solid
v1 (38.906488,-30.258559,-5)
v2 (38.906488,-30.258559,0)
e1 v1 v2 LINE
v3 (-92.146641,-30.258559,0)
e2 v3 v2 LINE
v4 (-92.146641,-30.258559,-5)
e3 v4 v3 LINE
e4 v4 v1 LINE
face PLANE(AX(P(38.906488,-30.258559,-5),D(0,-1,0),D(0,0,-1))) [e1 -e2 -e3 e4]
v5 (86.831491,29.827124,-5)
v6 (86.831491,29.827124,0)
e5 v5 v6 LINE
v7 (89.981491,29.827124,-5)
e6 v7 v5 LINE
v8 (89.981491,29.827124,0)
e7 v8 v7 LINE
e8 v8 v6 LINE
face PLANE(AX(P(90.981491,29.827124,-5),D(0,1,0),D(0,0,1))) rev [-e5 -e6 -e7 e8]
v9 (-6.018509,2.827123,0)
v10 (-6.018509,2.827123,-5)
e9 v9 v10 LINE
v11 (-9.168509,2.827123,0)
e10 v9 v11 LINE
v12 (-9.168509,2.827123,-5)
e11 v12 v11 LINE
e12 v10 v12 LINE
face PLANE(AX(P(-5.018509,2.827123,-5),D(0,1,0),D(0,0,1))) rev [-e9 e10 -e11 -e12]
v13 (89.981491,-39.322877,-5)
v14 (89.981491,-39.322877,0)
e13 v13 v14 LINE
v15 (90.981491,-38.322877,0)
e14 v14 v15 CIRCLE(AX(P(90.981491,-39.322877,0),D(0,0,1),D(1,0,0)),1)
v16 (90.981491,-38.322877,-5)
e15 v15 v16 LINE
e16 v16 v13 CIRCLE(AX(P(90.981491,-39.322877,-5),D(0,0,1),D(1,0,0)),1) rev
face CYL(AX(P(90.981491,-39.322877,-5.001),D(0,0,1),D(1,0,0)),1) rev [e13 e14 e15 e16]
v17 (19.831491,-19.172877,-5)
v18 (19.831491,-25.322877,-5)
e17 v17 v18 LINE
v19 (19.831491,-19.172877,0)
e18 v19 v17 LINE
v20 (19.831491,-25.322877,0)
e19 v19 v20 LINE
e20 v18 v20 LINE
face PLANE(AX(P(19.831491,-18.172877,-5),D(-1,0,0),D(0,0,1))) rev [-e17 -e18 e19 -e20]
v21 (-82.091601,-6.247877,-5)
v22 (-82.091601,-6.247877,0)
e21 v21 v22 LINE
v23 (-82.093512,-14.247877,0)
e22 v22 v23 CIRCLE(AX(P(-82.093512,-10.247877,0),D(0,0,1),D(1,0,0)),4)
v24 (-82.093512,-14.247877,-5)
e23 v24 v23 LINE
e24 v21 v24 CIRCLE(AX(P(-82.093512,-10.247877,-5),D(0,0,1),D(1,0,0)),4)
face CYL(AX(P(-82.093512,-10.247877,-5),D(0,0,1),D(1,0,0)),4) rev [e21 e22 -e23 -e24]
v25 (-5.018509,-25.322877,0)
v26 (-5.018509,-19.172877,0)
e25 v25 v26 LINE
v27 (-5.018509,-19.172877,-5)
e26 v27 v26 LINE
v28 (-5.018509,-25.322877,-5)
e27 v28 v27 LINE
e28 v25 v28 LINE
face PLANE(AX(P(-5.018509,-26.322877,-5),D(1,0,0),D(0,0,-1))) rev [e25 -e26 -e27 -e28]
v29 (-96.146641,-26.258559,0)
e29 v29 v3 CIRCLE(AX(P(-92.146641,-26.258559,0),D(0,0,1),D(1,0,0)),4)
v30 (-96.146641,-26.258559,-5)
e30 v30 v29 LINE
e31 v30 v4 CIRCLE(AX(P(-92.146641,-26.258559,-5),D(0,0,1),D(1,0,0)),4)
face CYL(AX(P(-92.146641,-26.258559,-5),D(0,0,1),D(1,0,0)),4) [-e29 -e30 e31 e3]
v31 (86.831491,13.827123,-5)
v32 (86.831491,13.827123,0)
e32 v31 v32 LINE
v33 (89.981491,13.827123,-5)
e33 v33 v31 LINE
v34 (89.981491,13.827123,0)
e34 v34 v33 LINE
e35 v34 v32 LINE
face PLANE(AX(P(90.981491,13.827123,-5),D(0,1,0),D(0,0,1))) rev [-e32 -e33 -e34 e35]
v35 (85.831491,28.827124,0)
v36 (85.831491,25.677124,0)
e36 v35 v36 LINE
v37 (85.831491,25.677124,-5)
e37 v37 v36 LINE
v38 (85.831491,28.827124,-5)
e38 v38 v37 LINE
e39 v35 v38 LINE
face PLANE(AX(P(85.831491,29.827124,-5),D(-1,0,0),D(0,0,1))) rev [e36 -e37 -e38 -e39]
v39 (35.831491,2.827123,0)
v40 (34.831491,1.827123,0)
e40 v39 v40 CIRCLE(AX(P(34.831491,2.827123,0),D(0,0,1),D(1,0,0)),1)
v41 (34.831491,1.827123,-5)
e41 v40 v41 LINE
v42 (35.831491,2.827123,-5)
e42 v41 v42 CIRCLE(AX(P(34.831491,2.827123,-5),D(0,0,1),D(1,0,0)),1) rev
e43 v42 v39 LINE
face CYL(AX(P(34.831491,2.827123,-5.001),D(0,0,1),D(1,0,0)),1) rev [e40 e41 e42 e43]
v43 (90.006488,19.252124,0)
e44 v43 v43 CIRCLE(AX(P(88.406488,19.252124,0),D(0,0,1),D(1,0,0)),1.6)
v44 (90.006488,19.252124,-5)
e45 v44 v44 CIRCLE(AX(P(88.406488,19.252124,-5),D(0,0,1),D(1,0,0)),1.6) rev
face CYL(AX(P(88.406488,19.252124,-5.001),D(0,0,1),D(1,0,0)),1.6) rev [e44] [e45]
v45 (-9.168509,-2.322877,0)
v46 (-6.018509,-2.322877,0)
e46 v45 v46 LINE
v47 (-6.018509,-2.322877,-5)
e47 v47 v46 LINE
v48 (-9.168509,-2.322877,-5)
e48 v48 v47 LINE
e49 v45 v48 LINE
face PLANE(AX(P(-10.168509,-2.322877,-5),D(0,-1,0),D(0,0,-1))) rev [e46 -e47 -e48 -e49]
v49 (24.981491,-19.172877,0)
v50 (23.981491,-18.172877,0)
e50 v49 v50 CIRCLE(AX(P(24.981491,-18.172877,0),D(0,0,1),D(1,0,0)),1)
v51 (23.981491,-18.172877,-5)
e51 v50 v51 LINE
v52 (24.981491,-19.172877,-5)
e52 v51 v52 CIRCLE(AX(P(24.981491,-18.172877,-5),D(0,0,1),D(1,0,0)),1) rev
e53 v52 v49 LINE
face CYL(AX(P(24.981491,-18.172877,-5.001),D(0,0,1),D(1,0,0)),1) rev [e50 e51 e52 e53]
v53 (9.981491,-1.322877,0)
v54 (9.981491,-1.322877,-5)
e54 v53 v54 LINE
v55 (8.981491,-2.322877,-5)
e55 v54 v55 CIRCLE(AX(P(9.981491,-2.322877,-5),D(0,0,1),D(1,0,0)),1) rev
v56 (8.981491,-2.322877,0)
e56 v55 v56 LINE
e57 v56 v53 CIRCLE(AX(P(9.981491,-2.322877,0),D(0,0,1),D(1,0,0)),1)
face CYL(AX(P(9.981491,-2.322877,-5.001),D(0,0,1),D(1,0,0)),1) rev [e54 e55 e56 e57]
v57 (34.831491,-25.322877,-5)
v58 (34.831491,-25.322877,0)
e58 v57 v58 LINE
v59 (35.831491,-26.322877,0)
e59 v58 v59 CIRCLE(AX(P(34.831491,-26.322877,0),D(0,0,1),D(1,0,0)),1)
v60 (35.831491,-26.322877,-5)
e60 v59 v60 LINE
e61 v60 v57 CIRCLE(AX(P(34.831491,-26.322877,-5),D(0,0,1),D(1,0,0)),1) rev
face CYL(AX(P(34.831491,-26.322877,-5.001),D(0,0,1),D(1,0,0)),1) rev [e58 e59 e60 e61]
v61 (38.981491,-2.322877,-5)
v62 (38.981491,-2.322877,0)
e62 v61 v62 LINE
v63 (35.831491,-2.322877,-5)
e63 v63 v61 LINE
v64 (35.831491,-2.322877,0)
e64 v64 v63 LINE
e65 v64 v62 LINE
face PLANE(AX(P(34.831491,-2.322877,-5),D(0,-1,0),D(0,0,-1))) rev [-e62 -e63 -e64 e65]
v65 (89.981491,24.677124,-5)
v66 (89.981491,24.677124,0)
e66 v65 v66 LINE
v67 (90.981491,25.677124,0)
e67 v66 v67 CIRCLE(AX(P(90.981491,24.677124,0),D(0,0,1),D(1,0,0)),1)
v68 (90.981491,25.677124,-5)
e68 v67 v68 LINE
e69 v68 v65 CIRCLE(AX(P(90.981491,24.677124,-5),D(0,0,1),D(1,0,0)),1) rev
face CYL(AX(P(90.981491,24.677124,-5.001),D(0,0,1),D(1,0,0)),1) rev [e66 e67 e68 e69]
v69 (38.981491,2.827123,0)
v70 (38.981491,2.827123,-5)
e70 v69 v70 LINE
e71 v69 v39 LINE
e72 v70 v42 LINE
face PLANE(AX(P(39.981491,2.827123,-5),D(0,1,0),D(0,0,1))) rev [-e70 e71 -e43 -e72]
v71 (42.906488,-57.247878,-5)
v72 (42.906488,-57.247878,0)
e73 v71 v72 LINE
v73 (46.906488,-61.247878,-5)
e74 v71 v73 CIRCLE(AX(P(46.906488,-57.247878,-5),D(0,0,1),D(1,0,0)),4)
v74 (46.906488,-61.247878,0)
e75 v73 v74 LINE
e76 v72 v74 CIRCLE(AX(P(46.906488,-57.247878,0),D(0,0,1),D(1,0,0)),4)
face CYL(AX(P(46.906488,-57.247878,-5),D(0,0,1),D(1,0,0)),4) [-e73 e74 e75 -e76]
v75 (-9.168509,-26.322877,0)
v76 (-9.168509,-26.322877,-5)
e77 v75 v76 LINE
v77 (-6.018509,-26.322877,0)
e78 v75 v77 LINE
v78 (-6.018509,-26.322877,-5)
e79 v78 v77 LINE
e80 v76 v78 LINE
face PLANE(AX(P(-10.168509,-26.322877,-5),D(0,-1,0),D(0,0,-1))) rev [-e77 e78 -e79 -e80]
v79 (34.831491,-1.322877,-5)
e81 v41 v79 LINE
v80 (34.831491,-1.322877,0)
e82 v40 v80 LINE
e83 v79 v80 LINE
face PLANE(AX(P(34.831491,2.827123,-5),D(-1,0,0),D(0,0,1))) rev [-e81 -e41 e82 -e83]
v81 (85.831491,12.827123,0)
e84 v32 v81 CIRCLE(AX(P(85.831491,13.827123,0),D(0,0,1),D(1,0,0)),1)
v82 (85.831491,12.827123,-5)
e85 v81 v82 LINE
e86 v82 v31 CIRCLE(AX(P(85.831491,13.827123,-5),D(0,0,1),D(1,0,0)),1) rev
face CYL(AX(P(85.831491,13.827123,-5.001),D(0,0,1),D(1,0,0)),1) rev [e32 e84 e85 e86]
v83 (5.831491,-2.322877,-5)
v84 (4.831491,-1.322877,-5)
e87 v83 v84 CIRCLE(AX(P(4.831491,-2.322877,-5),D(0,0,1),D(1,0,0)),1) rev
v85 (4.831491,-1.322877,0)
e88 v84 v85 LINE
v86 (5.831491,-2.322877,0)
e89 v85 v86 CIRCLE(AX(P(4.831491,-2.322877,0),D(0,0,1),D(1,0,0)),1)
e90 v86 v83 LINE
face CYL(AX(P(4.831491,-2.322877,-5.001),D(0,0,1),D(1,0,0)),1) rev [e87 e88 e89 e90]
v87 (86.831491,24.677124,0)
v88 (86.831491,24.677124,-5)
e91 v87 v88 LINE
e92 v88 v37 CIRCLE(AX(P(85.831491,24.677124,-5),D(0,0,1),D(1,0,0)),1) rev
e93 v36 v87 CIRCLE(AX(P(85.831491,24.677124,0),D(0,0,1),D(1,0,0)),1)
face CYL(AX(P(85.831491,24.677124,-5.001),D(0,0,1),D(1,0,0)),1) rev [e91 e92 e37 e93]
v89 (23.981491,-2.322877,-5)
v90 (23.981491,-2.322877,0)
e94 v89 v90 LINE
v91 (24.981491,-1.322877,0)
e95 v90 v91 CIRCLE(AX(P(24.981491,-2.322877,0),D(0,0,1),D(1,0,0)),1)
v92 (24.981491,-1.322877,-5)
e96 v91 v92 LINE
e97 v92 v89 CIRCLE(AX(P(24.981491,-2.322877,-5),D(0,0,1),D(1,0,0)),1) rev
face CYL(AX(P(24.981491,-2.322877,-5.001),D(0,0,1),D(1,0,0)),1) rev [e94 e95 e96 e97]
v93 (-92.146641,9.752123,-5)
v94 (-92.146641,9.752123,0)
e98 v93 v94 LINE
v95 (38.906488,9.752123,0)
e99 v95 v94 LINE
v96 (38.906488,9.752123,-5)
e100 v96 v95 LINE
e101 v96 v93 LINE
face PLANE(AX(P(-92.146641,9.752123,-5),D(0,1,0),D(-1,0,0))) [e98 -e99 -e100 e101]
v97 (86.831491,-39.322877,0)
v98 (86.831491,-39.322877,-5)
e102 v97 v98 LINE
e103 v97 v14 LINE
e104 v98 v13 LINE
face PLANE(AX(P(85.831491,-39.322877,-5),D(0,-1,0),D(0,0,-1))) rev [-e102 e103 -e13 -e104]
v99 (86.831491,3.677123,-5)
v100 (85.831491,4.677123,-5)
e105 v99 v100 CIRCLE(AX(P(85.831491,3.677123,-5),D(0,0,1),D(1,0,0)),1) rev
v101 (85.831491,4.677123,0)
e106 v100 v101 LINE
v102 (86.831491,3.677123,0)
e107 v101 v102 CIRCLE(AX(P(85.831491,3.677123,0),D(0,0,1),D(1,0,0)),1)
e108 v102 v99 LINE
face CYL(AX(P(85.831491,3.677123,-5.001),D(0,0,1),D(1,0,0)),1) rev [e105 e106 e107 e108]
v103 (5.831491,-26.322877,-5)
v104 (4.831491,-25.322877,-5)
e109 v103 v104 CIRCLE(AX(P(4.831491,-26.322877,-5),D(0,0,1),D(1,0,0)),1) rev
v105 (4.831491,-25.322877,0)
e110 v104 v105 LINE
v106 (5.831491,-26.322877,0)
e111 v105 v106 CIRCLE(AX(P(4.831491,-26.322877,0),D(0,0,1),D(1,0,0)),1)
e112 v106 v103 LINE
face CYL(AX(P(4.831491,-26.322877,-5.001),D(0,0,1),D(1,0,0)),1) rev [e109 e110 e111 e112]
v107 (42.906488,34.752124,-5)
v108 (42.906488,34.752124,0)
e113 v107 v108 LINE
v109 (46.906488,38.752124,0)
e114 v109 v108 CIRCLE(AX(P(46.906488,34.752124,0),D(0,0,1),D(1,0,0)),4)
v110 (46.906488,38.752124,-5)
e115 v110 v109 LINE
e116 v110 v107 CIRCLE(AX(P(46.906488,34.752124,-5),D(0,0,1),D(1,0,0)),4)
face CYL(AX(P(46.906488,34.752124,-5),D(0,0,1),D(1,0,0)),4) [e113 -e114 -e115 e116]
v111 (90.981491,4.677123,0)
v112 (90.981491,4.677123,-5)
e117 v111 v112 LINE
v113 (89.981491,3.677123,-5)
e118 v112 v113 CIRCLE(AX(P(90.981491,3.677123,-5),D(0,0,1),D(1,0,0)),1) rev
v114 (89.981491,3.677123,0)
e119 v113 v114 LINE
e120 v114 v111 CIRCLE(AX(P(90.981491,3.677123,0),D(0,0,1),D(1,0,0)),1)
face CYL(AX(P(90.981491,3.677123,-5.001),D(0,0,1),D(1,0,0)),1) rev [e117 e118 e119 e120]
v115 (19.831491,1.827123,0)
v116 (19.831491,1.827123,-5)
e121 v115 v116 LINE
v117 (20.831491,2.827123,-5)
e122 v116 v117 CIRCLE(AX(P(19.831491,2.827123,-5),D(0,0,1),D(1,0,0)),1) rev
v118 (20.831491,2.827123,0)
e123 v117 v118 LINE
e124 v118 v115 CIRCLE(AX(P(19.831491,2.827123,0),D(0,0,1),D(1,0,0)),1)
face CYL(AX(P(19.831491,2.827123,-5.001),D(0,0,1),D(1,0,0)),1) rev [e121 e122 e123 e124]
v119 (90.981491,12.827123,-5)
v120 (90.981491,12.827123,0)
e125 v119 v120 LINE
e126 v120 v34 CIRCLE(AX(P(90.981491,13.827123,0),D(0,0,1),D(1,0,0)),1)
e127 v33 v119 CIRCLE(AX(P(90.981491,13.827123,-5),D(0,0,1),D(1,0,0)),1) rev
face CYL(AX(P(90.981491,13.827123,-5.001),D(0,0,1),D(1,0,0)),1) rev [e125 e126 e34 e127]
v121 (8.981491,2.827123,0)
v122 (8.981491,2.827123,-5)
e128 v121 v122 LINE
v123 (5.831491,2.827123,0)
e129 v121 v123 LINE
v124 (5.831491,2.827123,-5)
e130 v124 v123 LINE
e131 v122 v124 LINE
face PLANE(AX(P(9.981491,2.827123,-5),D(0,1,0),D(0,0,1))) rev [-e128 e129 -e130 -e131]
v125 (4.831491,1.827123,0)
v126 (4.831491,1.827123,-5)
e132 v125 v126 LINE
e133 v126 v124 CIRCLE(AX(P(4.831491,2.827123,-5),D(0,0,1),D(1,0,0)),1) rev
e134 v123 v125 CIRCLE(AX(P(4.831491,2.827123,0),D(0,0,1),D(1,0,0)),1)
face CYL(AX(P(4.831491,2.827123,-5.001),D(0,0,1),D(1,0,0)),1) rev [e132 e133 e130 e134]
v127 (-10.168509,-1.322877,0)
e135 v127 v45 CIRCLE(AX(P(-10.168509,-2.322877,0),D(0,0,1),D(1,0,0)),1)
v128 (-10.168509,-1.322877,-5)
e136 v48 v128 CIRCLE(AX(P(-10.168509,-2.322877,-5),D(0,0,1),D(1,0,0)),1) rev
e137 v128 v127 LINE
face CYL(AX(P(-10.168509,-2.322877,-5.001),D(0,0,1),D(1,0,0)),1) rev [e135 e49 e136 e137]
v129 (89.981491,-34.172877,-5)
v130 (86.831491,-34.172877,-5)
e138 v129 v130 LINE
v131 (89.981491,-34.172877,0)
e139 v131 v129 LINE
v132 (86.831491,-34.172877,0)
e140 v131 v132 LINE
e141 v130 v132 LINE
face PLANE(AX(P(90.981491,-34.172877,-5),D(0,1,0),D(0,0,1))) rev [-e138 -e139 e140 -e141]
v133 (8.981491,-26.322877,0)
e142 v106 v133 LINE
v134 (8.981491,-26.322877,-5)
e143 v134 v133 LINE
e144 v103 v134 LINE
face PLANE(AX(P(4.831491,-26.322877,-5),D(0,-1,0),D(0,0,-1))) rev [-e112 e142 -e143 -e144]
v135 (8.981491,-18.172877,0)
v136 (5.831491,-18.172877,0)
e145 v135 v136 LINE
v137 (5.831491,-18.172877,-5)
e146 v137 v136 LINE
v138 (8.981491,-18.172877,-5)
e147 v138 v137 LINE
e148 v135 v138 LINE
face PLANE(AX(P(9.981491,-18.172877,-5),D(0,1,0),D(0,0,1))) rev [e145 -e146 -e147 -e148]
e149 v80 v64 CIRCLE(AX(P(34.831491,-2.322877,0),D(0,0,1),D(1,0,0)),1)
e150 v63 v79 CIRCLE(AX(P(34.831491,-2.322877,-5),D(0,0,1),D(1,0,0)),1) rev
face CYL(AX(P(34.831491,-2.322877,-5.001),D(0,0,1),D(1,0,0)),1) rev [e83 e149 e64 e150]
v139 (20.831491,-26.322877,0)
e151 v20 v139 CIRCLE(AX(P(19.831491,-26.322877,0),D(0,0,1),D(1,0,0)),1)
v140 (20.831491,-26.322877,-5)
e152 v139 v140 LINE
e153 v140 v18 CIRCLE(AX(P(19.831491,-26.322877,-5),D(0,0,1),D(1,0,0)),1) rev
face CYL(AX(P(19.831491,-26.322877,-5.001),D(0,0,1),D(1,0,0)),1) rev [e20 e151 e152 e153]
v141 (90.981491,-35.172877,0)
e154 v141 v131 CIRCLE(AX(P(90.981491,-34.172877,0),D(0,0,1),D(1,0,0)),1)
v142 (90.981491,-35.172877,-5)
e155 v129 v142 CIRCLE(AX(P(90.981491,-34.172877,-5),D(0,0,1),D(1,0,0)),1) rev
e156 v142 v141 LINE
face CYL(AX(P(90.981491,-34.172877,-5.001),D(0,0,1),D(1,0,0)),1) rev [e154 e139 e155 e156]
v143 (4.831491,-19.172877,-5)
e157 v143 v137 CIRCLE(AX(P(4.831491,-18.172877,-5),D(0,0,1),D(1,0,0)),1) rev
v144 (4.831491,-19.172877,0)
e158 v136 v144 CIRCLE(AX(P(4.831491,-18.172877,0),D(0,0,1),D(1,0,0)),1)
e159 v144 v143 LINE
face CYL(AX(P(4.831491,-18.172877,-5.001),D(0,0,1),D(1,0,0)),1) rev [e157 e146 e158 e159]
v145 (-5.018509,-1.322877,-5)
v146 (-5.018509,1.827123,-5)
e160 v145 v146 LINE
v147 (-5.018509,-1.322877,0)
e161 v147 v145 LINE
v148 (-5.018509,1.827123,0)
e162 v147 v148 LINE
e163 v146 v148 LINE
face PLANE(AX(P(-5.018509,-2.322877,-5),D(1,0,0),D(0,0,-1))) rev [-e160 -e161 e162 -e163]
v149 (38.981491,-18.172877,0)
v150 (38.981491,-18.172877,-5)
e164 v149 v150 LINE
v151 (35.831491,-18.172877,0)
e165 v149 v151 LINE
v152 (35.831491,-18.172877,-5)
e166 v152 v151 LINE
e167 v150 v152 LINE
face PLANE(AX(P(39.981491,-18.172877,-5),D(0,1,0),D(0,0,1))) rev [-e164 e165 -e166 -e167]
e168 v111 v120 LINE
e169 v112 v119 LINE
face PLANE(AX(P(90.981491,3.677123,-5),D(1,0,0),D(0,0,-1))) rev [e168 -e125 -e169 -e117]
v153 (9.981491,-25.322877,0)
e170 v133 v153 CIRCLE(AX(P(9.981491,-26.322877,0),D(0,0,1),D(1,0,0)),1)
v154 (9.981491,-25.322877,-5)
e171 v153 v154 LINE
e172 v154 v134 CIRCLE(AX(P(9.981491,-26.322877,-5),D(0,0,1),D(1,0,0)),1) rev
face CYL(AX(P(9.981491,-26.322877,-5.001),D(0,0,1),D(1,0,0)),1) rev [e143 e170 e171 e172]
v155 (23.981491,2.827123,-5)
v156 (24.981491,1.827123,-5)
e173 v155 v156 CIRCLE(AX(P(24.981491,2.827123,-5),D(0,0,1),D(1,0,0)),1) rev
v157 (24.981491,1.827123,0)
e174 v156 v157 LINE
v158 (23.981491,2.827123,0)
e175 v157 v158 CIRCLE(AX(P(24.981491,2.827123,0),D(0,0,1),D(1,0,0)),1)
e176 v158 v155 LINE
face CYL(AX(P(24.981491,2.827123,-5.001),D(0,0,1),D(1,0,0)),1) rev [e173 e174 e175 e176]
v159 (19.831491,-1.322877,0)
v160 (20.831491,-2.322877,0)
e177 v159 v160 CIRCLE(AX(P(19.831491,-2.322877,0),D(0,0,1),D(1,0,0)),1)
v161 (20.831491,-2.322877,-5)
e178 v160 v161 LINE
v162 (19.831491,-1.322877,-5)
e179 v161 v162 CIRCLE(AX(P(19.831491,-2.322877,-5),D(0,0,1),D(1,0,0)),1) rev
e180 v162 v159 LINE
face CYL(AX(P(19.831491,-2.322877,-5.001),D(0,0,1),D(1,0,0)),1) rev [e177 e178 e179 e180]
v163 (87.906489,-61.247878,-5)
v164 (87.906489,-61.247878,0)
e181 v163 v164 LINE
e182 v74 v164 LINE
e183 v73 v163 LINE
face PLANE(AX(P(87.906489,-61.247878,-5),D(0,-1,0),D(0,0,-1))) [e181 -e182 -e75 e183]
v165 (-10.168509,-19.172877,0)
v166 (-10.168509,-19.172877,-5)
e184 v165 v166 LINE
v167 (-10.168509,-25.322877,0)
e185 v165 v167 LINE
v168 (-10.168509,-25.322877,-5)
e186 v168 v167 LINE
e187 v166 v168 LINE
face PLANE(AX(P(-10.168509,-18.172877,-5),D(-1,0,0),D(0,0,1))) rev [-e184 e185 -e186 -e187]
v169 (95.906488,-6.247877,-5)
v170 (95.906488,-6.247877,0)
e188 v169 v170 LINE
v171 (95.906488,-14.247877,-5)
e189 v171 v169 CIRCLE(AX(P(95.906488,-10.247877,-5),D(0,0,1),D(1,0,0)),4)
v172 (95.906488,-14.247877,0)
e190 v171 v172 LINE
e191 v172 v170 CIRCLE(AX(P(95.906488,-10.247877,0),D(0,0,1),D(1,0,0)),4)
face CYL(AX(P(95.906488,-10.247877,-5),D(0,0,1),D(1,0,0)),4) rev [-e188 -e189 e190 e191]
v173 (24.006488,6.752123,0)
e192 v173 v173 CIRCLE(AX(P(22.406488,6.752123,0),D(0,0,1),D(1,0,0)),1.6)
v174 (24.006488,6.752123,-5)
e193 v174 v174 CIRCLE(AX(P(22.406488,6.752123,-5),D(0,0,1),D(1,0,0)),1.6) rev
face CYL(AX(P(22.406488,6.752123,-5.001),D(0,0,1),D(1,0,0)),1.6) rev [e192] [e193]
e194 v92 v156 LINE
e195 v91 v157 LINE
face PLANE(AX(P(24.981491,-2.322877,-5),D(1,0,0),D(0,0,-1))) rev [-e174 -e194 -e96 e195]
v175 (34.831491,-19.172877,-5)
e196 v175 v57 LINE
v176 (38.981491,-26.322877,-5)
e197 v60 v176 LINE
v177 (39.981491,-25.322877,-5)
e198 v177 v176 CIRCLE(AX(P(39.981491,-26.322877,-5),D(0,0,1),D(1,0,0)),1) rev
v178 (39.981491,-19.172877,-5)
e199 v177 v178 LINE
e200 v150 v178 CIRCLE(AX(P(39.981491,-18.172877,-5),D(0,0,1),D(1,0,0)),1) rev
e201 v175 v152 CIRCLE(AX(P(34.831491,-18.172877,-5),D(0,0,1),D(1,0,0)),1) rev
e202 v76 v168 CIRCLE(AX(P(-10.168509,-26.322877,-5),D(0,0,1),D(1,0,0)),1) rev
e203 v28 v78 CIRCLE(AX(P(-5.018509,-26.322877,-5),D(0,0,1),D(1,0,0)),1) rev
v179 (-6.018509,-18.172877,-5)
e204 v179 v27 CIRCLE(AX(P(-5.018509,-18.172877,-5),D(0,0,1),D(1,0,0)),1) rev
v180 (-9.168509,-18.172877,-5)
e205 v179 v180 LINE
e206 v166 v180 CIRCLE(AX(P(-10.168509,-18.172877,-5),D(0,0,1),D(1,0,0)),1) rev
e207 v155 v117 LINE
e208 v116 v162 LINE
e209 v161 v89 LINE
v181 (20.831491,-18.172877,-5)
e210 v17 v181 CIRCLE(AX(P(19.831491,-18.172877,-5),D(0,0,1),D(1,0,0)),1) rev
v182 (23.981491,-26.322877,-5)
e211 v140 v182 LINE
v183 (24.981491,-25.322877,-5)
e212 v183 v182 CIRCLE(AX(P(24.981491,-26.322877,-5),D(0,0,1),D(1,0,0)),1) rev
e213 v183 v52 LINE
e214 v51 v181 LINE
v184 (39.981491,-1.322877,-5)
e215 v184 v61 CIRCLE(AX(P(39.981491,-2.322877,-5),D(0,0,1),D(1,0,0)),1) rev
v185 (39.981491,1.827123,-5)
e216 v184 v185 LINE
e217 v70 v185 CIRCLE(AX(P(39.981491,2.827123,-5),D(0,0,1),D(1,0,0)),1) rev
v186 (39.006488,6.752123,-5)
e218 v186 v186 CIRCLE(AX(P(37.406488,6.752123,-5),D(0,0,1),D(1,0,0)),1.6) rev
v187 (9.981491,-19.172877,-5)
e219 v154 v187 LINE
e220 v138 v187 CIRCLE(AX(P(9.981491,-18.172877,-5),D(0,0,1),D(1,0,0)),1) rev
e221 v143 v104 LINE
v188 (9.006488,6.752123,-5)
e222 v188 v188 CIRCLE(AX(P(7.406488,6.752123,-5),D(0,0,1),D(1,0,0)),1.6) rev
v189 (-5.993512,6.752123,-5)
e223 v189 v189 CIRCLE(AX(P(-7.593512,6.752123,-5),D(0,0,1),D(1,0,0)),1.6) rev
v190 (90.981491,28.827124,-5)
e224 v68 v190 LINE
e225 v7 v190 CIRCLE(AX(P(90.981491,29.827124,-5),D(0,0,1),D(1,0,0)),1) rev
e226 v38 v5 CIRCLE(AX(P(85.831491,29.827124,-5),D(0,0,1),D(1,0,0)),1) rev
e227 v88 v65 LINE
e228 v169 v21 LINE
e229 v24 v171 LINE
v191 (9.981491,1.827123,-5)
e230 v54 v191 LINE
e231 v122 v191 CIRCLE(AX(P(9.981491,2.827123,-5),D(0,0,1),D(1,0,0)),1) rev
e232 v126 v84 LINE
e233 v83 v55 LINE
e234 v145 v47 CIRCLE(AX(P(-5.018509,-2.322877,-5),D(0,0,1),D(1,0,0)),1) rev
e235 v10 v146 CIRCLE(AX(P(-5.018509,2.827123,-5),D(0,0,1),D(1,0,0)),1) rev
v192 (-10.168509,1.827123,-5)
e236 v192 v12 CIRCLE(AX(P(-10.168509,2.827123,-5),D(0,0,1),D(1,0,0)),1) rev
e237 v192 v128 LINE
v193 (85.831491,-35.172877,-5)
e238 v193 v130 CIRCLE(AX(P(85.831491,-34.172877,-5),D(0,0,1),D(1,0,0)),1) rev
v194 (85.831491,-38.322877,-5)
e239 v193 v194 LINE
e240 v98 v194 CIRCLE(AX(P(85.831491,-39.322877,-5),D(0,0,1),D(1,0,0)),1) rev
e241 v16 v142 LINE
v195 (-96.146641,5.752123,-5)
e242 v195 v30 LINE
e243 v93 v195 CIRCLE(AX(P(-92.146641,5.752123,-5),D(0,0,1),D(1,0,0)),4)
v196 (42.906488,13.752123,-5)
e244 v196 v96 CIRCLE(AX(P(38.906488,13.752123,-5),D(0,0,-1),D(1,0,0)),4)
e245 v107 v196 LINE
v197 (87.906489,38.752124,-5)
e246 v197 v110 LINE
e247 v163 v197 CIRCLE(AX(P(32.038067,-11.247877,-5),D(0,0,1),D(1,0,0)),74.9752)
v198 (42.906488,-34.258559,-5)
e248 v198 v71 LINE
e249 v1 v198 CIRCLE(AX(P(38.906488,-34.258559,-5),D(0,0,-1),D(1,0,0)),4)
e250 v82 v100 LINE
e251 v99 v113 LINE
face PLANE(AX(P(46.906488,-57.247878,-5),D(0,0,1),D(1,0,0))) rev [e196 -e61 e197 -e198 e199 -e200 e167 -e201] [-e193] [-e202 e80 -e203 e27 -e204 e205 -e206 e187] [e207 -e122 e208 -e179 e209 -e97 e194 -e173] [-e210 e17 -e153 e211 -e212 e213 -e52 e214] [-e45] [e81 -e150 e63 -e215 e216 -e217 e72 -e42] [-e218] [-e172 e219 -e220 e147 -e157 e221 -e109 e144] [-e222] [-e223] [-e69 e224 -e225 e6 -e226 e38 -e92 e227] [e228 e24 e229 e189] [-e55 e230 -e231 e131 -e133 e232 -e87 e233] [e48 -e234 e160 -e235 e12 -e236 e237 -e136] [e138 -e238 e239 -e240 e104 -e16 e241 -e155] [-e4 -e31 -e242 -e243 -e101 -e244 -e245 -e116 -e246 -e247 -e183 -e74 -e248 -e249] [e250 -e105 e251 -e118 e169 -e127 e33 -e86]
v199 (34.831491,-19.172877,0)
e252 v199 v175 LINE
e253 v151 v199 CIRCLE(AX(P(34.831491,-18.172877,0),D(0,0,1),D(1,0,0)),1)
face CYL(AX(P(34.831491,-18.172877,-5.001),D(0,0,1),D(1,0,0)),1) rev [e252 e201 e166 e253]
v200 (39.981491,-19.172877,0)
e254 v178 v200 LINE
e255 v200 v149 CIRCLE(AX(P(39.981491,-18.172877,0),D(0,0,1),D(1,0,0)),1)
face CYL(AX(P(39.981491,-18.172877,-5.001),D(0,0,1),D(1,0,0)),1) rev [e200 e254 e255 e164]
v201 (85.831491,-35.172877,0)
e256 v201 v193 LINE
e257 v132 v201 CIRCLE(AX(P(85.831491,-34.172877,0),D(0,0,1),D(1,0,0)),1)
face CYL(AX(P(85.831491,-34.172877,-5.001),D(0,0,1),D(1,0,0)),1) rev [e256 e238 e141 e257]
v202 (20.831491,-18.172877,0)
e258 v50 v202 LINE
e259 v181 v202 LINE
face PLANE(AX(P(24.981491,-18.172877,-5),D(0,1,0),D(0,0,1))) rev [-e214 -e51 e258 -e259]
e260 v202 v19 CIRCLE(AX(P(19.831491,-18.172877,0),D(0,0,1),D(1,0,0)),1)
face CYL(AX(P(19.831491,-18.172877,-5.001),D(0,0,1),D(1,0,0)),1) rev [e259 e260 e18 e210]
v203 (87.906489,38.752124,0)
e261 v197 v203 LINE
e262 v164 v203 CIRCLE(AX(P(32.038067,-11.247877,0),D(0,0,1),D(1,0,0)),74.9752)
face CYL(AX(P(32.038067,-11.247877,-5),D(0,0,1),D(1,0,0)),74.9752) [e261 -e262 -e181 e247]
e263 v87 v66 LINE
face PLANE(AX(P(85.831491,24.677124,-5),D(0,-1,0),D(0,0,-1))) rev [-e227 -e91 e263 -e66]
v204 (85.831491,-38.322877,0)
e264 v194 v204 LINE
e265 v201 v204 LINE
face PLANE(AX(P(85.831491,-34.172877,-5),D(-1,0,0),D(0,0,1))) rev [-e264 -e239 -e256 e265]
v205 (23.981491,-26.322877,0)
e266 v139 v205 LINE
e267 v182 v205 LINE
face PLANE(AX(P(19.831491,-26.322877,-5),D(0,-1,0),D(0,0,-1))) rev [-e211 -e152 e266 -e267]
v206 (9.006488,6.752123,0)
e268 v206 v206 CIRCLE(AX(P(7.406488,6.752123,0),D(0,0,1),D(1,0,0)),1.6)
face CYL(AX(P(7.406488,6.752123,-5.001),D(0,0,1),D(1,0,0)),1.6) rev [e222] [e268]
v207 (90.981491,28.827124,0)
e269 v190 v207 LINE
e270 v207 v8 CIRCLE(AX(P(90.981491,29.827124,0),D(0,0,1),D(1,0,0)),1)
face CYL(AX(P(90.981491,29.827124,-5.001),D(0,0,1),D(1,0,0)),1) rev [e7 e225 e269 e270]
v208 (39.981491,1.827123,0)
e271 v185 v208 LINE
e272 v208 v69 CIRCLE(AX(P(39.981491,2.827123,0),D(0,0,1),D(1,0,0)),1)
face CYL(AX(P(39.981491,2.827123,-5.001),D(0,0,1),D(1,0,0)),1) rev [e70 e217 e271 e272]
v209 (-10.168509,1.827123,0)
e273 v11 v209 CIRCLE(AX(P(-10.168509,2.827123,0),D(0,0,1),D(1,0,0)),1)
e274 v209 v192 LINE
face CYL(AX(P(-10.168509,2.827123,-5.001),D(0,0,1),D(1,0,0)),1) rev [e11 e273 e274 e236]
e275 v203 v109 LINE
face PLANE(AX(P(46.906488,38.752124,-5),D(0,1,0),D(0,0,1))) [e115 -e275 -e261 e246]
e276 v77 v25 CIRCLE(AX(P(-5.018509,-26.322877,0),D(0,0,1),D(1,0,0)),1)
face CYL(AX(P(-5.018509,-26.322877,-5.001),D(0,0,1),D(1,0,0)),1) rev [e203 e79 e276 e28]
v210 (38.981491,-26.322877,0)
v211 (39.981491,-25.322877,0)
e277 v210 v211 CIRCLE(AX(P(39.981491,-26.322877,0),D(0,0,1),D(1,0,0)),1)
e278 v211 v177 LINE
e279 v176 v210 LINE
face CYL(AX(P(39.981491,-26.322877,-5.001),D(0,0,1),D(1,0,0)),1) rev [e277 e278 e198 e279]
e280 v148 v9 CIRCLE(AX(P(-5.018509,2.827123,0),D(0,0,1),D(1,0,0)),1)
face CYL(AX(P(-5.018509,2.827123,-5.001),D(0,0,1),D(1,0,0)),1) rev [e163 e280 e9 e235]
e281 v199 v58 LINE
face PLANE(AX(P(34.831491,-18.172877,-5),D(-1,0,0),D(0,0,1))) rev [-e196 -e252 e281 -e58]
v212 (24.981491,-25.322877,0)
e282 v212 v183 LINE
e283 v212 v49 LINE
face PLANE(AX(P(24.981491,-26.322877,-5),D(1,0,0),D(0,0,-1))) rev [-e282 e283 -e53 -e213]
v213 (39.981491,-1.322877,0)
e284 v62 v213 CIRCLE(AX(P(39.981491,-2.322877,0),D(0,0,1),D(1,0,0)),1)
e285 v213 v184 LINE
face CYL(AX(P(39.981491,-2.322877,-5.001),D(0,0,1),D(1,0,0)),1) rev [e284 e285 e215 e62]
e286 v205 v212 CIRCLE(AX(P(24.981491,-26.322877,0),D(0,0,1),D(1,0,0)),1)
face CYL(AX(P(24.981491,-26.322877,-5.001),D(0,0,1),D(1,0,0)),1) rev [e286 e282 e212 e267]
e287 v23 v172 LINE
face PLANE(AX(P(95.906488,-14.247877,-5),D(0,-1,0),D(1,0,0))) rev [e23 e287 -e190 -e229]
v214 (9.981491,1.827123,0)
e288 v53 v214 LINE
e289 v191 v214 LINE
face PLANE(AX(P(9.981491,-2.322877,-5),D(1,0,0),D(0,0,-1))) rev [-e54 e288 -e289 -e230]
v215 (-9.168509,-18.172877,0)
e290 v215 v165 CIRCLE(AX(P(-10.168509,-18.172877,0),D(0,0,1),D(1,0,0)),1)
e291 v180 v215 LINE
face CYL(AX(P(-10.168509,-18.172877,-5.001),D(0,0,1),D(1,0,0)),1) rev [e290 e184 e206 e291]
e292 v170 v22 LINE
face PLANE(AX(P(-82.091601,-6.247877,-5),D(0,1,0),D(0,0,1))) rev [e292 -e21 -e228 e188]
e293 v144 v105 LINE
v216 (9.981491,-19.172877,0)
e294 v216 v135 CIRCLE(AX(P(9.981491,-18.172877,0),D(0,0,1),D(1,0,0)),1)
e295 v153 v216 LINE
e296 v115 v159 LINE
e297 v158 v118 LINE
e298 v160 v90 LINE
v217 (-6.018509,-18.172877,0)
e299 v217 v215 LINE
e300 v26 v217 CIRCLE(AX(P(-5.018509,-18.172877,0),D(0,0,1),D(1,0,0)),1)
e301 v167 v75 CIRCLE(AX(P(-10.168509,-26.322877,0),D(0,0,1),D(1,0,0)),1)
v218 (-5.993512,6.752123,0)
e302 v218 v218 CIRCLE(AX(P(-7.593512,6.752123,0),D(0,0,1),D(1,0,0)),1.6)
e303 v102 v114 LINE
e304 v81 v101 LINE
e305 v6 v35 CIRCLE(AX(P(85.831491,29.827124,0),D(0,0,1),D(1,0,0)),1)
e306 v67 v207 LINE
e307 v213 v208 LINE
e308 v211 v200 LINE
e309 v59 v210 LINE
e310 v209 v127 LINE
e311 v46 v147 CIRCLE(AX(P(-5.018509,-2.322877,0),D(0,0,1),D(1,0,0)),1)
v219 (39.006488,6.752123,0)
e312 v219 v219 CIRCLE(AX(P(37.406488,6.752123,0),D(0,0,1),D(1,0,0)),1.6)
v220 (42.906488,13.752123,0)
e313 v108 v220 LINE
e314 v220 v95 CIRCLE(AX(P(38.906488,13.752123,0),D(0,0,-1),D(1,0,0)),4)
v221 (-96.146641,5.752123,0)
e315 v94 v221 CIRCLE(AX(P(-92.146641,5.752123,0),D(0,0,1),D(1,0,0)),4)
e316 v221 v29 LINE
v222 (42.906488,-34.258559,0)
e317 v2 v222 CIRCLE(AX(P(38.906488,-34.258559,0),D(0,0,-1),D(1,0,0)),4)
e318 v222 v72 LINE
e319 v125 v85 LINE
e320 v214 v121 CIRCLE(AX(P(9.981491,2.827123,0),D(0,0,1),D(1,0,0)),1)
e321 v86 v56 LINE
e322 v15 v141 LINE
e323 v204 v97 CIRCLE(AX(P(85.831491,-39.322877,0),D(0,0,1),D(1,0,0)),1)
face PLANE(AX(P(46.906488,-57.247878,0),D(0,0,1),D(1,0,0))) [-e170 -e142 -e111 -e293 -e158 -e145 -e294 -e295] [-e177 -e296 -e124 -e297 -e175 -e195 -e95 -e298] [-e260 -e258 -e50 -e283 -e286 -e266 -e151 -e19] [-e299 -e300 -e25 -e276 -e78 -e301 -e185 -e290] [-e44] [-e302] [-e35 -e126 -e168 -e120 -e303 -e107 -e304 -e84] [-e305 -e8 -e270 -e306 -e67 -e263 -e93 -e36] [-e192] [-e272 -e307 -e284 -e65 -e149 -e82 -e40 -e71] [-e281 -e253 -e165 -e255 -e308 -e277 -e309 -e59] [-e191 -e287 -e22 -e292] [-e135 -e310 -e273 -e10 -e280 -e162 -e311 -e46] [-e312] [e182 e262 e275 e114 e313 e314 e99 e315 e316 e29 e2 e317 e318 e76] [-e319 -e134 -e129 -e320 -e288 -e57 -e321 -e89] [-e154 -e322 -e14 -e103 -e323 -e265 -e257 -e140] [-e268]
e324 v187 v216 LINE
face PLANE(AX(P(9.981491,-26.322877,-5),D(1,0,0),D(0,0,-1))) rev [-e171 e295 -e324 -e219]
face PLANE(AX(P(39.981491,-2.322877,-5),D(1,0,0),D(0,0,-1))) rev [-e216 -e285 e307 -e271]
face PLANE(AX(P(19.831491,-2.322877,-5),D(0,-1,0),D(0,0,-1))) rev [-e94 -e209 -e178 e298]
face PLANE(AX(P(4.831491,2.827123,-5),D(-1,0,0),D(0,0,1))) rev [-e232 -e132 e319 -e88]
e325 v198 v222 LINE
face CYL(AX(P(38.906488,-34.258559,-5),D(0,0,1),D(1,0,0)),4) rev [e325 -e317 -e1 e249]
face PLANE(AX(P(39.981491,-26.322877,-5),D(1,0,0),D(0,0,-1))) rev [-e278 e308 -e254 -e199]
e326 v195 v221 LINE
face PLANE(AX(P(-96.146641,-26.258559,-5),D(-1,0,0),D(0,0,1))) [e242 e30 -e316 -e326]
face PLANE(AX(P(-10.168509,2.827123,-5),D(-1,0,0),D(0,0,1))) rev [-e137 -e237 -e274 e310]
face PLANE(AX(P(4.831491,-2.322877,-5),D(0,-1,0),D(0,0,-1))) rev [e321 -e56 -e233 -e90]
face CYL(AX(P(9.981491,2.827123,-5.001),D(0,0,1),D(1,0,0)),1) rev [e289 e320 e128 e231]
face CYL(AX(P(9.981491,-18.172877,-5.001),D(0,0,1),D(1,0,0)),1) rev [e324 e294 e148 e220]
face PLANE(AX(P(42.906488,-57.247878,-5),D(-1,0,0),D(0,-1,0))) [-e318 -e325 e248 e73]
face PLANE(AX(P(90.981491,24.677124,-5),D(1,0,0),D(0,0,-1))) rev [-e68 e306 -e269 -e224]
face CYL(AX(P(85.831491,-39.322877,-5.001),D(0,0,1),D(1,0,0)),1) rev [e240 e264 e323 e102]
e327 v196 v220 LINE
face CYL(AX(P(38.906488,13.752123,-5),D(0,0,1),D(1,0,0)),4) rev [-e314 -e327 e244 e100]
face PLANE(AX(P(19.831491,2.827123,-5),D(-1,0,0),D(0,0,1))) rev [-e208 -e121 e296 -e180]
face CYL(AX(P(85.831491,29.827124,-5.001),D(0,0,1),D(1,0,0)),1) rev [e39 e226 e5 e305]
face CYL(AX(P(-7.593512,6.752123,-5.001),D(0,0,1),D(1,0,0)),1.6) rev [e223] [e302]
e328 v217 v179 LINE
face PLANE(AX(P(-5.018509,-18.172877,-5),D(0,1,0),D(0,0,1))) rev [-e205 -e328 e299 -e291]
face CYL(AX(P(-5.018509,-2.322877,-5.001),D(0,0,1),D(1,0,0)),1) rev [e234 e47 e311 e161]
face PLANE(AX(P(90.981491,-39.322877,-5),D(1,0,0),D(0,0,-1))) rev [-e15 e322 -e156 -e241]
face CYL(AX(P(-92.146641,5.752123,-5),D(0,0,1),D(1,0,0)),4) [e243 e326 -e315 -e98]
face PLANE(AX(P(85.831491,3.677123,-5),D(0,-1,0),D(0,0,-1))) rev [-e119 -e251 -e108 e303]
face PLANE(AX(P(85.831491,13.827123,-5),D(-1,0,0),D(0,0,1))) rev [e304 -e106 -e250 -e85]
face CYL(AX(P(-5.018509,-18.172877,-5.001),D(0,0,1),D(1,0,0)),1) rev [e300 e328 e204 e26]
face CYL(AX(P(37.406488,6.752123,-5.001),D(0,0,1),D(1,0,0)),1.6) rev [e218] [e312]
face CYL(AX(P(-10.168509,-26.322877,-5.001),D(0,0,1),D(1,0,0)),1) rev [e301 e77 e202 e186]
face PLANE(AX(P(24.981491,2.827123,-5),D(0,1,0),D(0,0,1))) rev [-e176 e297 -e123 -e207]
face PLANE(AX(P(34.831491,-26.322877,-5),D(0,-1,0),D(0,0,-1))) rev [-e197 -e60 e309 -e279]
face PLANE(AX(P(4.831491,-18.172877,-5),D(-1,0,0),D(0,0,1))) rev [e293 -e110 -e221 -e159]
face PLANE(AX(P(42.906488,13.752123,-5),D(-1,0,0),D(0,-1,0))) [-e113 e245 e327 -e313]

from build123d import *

# Parameters (mm, degrees)
ESBO_O1_R             = 1.5
ESBO_O1_R_2           = 1.500000022
ESBO_O1_W             = 5.15
ESBO_O1_H             = 5.150000119
ESBO_O1_H_2           = 10.15
ESBO_O1_H_3           = 8.150000119
ESBO_O1_H_4           = 5.15
FLANGE_BASE1_DEPTH    = 5
ESBO_O2_R             = 1
CORTE_EXTRUS_O1_DEPTH = 5
CORTE_EXTRUS_O2_REACH = 125.402
ESBO_O3_R             = 1.6


# Sheet-metal steps are written as plain solids
with BuildPart() as part:
    # Esboço1 → Flange-base1 (new body)
    with BuildSketch(Plane.XY):
        with BuildLine():
            Line((42.906488073, -57.24787756), (42.906488073, -34.258558753))
            ThreePointArc((42.906488073, -34.258558753), (41.734915199, -31.430131624), (38.906488072, -30.258558747))
            Line((38.906488072, -30.258558747), (-92.146640805, -30.258558747))
            ThreePointArc((-92.146640805, -30.258558747), (-94.975067929, -29.086985872), (-96.146640805, -26.258558747))
            Line((-96.146640805, -26.258558747), (-96.146640805, 5.752123418))
            ThreePointArc((-96.146640805, 5.752123418), (-94.975067929, 8.580550543), (-92.146640805, 9.752123418))
            Line((-92.146640805, 9.752123418), (38.906488017, 9.752123418))
            ThreePointArc((38.906488017, 9.752123418), (41.73491514, 10.923696291), (42.906488017, 13.752123413))
            Line((42.906488017, 13.752123413), (42.906488017, 34.752123929))
            ThreePointArc((42.906488017, 34.752123929), (44.078060914, 37.58055107), (46.906488073, 38.752123924))
            Line((46.906488073, 38.752123924), (87.906488738, 38.752123924))
            ThreePointArc((87.906488738, 38.752123924), (107.013267009, -11.247876821), (87.906488738, -61.247877566))
            Line((87.906488738, -61.247877566), (46.906488073, -61.247877566))
            ThreePointArc((46.906488073, -61.247877566), (44.078060946, -60.076304689), (42.906488073, -57.24787756))
        make_face()
        with Locations((37.406487746, 6.752123154)):
            Circle(ESBO_O1_R, mode=Mode.SUBTRACT)
        with Locations((88.406488193, 19.252123619)):
            Circle(ESBO_O1_R_2, mode=Mode.SUBTRACT)
        with Locations((22.406487746, 6.752123154)):
            Circle(ESBO_O1_R, mode=Mode.SUBTRACT)
        with Locations((7.406487746, 6.752123154)):
            Circle(ESBO_O1_R, mode=Mode.SUBTRACT)
        with Locations((-7.593512254, 6.752123154)):
            Circle(ESBO_O1_R, mode=Mode.SUBTRACT)
        with BuildLine():
            Line((-82.091601362, -6.247877277), (95.906488231, -6.247877277))
            ThreePointArc((95.906488231, -6.247877277), (99.906488003, -10.247877049), (95.906488231, -14.247876821))
            Line((95.906488231, -14.247876821), (-82.093511769, -14.247876821))
            ThreePointArc((-82.093511769, -14.247876821), (-86.093511655, -10.246921617), (-82.091601362, -6.247877277))
        make_face(mode=Mode.SUBTRACT)
        with Locations((37.406490824, 0.252123359)):
            Rectangle(ESBO_O1_W, ESBO_O1_H, mode=Mode.SUBTRACT)
        with Locations((88.406490824, 8.752123299)):
            Rectangle(ESBO_O1_W, ESBO_O1_H_2, mode=Mode.SUBTRACT)
        with Locations((88.406490824, -36.747877)):
            Rectangle(ESBO_O1_W, ESBO_O1_H, mode=Mode.SUBTRACT)
        with Locations((37.406490824, -22.247877)):
            Rectangle(ESBO_O1_W, ESBO_O1_H_3, mode=Mode.SUBTRACT)
        with Locations((88.406490824, 27.252123537)):
            Rectangle(ESBO_O1_W, ESBO_O1_H_4, mode=Mode.SUBTRACT)
        with Locations((22.406490824, 0.252123359)):
            Rectangle(ESBO_O1_W, ESBO_O1_H, mode=Mode.SUBTRACT)
        with Locations((22.406490824, -22.247877)):
            Rectangle(ESBO_O1_W, ESBO_O1_H_3, mode=Mode.SUBTRACT)
        with Locations((7.406490824, 0.252123359)):
            Rectangle(ESBO_O1_W, ESBO_O1_H, mode=Mode.SUBTRACT)
        with Locations((7.406490824, -22.247877)):
            Rectangle(ESBO_O1_W, ESBO_O1_H_3, mode=Mode.SUBTRACT)
        with Locations((-7.593509176, 0.252123359)):
            Rectangle(ESBO_O1_W, ESBO_O1_H, mode=Mode.SUBTRACT)
        with Locations((-7.593509176, -22.247877)):
            Rectangle(ESBO_O1_W, ESBO_O1_H_3, mode=Mode.SUBTRACT)
    extrude(amount=-FLANGE_BASE1_DEPTH)

    # Esboço2 → Corte-extrusão1 (cut)
    with BuildSketch(Plane.XY):
        with Locations((90.981490824, 29.827123537)):
            Circle(ESBO_O2_R)
        with Locations((85.831490824, 29.827123537)):
            Circle(ESBO_O2_R)
        with Locations((85.831490824, 24.677123537)):
            Circle(ESBO_O2_R)
        with Locations((90.981490824, 24.677123537)):
            Circle(ESBO_O2_R)
        with Locations((90.981490824, 13.827123299)):
            Circle(ESBO_O2_R)
        with Locations((85.831490824, 13.827123299)):
            Circle(ESBO_O2_R)
        with Locations((90.981490824, 3.677123299)):
            Circle(ESBO_O2_R)
        with Locations((85.831490824, 3.677123299)):
            Circle(ESBO_O2_R)
        with Locations((85.831490824, -34.17287694)):
            Circle(ESBO_O2_R)
        with Locations((90.981490824, -34.17287694)):
            Circle(ESBO_O2_R)
        with Locations((90.981490824, -39.322877059)):
            Circle(ESBO_O2_R)
        with Locations((85.831490824, -39.322877059)):
            Circle(ESBO_O2_R)
        with Locations((34.831490824, 2.827123418)):
            Circle(ESBO_O2_R)
        with Locations((39.981490824, 2.827123418)):
            Circle(ESBO_O2_R)
        with Locations((39.981490824, -2.322876701)):
            Circle(ESBO_O2_R)
        with Locations((34.831490824, -2.322876701)):
            Circle(ESBO_O2_R)
        with Locations((34.831490824, -18.17287694)):
            Circle(ESBO_O2_R)
        with Locations((39.981490824, -18.17287694)):
            Circle(ESBO_O2_R)
        with Locations((39.981490824, -26.322877059)):
            Circle(ESBO_O2_R)
        with Locations((34.831490824, -26.322877059)):
            Circle(ESBO_O2_R)
        with Locations((19.831490824, 2.827123418)):
            Circle(ESBO_O2_R)
        with Locations((24.981490824, 2.827123418)):
            Circle(ESBO_O2_R)
        with Locations((24.981490824, -2.322876701)):
            Circle(ESBO_O2_R)
        with Locations((19.831490824, -2.322876701)):
            Circle(ESBO_O2_R)
        with Locations((19.831490824, -18.17287694)):
            Circle(ESBO_O2_R)
        with Locations((24.981490824, -18.17287694)):
            Circle(ESBO_O2_R)
        with Locations((24.981490824, -26.322877059)):
            Circle(ESBO_O2_R)
        with Locations((19.831490824, -26.322877059)):
            Circle(ESBO_O2_R)
        with Locations((4.831490824, 2.827123418)):
            Circle(ESBO_O2_R)
        with Locations((9.981490824, 2.827123418)):
            Circle(ESBO_O2_R)
        with Locations((9.981490824, -2.322876701)):
            Circle(ESBO_O2_R)
        with Locations((4.831490824, -2.322876701)):
            Circle(ESBO_O2_R)
        with Locations((4.831490824, -18.17287694)):
            Circle(ESBO_O2_R)
        with Locations((9.981490824, -18.17287694)):
            Circle(ESBO_O2_R)
        with Locations((9.981490824, -26.322877059)):
            Circle(ESBO_O2_R)
        with Locations((4.831490824, -26.322877059)):
            Circle(ESBO_O2_R)
        with Locations((-10.168509176, 2.827123418)):
            Circle(ESBO_O2_R)
        with Locations((-5.018509176, 2.827123418)):
            Circle(ESBO_O2_R)
        with Locations((-5.018509176, -2.322876701)):
            Circle(ESBO_O2_R)
        with Locations((-10.168509176, -2.322876701)):
            Circle(ESBO_O2_R)
        with Locations((-10.168509176, -18.17287694)):
            Circle(ESBO_O2_R)
        with Locations((-5.018509176, -18.17287694)):
            Circle(ESBO_O2_R)
        with Locations((-5.018509176, -26.322877059)):
            Circle(ESBO_O2_R)
        with Locations((-10.168509176, -26.322877059)):
            Circle(ESBO_O2_R)
    extrude(amount=-CORTE_EXTRUS_O1_DEPTH, mode=Mode.SUBTRACT)

    # Esboço3 → Corte-extrusão2 (cut, up to next)
    with BuildSketch(Plane.XY, mode=Mode.PRIVATE) as corte_extrus_o2_sk1:
        with Locations((88.406488193, 19.252123619)):
            Circle(ESBO_O3_R)
    corte_extrus_o2_tool1 = extrude(corte_extrus_o2_sk1.sketch, amount=-CORTE_EXTRUS_O2_REACH, mode=Mode.PRIVATE) & part.part
    # Esboço3 → Corte-extrusão2 (cut, up to next)
    with BuildSketch(Plane.XY, mode=Mode.PRIVATE) as corte_extrus_o2_sk2:
        with Locations((37.406487746, 6.752123154)):
            Circle(ESBO_O3_R)
    corte_extrus_o2_tool2 = extrude(corte_extrus_o2_sk2.sketch, amount=-CORTE_EXTRUS_O2_REACH, mode=Mode.PRIVATE) & part.part
    # Esboço3 → Corte-extrusão2 (cut, up to next)
    with BuildSketch(Plane.XY, mode=Mode.PRIVATE) as corte_extrus_o2_sk3:
        with Locations((22.406487746, 6.752123154)):
            Circle(ESBO_O3_R)
    corte_extrus_o2_tool3 = extrude(corte_extrus_o2_sk3.sketch, amount=-CORTE_EXTRUS_O2_REACH, mode=Mode.PRIVATE) & part.part
    # Esboço3 → Corte-extrusão2 (cut, up to next)
    with BuildSketch(Plane.XY, mode=Mode.PRIVATE) as corte_extrus_o2_sk4:
        with Locations((7.406487746, 6.752123154)):
            Circle(ESBO_O3_R)
    corte_extrus_o2_tool4 = extrude(corte_extrus_o2_sk4.sketch, amount=-CORTE_EXTRUS_O2_REACH, mode=Mode.PRIVATE) & part.part
    # Esboço3 → Corte-extrusão2 (cut, up to next)
    with BuildSketch(Plane.XY, mode=Mode.PRIVATE) as corte_extrus_o2_sk5:
        with Locations((-7.593512254, 6.752123154)):
            Circle(ESBO_O3_R)
    corte_extrus_o2_tool5 = extrude(corte_extrus_o2_sk5.sketch, amount=-CORTE_EXTRUS_O2_REACH, mode=Mode.PRIVATE) & part.part
    add(corte_extrus_o2_tool1.solids().sort_by_distance((88.406488, 19.252124, 0))[0], mode=Mode.SUBTRACT)
    add(corte_extrus_o2_tool2.solids().sort_by_distance((37.406488, 6.752123, 0))[0], mode=Mode.SUBTRACT)
    add(corte_extrus_o2_tool3.solids().sort_by_distance((22.406488, 6.752123, 0))[0], mode=Mode.SUBTRACT)
    add(corte_extrus_o2_tool4.solids().sort_by_distance((7.406488, 6.752123, 0))[0], mode=Mode.SUBTRACT)
    add(corte_extrus_o2_tool5.solids().sort_by_distance((-7.593512, 6.752123, 0))[0], mode=Mode.SUBTRACT)


solid = part.part
